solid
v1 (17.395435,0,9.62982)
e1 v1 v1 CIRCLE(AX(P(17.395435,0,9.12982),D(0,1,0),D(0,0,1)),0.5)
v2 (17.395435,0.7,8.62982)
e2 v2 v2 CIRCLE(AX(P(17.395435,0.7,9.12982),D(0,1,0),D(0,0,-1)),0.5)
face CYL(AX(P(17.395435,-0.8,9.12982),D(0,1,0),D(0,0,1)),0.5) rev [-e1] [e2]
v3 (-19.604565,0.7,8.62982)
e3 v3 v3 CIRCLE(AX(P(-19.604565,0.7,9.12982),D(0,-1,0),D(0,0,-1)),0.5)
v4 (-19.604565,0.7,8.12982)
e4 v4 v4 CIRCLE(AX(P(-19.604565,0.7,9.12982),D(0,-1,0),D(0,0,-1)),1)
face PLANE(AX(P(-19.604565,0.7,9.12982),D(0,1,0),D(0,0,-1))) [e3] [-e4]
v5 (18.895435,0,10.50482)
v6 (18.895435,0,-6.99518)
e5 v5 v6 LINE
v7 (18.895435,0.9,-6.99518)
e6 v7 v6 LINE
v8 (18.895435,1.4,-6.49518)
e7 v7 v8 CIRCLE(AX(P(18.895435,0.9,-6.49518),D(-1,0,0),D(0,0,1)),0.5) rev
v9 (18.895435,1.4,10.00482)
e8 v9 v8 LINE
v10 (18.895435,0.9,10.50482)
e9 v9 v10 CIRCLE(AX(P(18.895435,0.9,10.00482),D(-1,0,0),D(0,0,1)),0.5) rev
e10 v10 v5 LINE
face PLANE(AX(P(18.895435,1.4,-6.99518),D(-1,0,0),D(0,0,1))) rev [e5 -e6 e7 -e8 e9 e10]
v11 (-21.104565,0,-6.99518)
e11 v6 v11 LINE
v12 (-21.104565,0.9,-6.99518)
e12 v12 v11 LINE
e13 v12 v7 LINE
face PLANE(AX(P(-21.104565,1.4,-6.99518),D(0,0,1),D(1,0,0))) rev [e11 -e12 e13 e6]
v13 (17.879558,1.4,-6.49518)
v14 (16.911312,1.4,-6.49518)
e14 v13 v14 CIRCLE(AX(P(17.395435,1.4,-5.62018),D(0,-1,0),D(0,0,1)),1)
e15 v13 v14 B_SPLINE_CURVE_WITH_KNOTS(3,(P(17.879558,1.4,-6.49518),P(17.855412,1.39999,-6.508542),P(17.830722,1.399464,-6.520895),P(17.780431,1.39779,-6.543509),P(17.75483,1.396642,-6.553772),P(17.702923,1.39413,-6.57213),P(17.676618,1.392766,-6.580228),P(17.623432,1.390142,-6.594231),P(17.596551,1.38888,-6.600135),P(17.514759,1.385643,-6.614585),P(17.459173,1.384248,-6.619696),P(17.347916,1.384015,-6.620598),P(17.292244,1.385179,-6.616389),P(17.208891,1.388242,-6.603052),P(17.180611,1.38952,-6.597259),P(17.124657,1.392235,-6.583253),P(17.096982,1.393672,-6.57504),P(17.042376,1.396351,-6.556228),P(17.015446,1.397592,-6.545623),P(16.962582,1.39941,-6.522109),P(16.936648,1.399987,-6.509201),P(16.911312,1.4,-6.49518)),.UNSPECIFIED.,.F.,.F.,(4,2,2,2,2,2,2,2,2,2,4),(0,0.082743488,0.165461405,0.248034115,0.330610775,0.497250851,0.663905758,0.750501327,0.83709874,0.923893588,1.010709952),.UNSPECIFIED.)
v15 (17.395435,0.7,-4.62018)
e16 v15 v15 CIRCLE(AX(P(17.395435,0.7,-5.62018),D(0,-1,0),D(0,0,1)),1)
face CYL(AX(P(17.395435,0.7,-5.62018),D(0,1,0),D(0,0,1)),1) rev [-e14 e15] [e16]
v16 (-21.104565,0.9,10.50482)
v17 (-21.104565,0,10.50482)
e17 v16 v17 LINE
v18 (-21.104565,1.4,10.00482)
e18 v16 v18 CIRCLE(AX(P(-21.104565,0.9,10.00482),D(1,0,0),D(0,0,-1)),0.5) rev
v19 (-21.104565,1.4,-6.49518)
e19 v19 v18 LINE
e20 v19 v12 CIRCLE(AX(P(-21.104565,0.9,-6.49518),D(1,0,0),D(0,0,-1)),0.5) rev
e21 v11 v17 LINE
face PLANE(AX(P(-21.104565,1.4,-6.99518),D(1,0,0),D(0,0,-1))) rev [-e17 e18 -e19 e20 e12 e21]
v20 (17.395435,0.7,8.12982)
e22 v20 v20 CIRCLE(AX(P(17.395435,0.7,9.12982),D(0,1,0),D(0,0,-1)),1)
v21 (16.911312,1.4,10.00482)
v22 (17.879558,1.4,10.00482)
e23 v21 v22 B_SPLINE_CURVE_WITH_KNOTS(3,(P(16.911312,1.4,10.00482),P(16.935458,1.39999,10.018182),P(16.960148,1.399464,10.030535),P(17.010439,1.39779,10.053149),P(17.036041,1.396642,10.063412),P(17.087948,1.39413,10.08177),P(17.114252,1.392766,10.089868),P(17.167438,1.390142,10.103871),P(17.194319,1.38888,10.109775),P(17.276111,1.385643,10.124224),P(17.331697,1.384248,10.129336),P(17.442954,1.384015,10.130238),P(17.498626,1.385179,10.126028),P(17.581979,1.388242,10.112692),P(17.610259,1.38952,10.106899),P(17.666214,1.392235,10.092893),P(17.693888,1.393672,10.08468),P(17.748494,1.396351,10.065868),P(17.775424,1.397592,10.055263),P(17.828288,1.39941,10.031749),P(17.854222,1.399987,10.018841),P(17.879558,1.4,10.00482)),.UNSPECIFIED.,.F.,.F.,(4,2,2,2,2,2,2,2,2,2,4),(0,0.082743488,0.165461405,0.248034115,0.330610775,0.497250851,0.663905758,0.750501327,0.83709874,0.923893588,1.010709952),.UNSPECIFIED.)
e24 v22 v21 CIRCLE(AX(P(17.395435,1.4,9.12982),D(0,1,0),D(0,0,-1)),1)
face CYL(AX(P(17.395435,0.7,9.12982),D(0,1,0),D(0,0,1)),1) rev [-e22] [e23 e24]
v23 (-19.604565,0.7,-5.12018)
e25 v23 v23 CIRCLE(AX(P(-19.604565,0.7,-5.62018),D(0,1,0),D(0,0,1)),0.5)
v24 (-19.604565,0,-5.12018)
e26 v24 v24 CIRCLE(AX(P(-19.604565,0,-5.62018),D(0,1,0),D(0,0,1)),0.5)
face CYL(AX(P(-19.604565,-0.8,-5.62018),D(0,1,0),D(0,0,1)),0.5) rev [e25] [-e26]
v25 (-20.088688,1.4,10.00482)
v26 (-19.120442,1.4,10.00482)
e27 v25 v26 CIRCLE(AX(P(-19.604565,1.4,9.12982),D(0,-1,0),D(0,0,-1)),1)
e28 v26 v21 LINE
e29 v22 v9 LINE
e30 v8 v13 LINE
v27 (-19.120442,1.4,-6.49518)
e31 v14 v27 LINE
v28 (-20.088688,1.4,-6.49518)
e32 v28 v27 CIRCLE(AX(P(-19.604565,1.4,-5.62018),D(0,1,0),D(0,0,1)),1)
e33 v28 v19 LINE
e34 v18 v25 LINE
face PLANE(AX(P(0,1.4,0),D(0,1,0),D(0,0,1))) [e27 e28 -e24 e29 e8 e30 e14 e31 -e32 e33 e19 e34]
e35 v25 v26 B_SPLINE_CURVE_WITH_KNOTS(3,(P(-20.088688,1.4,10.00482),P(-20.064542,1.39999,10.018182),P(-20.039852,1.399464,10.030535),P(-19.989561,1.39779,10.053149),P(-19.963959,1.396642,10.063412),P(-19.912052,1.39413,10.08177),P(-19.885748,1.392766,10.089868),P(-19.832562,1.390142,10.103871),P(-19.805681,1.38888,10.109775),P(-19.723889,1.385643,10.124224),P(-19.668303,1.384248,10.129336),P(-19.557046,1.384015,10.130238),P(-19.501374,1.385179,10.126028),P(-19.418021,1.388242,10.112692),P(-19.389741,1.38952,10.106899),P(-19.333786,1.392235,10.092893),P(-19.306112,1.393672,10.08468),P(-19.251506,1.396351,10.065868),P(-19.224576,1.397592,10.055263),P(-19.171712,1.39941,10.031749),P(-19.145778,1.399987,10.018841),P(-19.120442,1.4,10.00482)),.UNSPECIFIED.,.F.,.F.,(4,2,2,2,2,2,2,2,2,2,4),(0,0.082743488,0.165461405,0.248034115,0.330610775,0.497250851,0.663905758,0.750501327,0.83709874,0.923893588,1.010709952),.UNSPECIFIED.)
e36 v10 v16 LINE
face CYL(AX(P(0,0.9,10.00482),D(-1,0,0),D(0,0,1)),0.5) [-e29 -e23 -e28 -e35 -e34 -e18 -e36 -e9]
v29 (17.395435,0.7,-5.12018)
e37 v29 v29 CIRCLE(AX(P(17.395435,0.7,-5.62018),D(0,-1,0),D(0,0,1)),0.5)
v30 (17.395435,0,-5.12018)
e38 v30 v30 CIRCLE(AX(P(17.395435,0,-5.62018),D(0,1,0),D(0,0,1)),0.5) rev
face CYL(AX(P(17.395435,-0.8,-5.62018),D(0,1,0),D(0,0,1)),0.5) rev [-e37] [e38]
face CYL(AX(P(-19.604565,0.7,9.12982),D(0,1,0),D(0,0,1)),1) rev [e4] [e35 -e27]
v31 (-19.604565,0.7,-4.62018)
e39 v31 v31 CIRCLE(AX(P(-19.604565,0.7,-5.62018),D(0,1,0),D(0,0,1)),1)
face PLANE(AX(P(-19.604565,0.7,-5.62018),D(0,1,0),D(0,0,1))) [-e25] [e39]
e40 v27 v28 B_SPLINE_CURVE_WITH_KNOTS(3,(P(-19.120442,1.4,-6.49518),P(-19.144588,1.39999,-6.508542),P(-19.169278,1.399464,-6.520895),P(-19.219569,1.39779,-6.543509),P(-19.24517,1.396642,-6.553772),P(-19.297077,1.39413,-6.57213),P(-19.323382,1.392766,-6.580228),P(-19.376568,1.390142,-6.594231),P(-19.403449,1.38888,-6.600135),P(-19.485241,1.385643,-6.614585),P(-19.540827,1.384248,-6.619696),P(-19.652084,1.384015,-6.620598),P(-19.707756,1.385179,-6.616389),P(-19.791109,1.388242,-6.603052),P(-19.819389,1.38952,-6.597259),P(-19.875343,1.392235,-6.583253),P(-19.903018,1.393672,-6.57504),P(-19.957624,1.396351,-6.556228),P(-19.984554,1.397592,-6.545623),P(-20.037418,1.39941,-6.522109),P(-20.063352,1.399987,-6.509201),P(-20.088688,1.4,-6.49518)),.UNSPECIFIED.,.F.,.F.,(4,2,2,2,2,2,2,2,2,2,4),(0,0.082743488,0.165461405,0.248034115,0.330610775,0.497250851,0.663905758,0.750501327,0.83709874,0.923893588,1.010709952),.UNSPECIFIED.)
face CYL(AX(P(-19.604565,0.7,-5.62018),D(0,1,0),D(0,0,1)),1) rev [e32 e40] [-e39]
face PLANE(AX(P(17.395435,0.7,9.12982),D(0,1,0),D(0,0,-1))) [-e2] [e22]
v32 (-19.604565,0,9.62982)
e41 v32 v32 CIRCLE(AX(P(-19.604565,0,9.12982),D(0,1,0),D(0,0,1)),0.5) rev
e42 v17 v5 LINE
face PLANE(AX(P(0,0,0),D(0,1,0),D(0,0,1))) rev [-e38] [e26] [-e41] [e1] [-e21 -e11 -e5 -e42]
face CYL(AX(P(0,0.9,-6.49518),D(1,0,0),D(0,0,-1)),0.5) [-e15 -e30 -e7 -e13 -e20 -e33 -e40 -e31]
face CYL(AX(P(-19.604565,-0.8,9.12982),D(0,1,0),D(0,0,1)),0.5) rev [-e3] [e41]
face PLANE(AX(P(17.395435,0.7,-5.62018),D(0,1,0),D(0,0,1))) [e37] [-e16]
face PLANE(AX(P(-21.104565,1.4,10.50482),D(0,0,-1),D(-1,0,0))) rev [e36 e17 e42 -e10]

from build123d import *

# Parameters (mm, degrees)
SKETCH_1_W               = 40
SKETCH_1_H               = 17.5
EXTRUDE_1_DEPTH          = 1.4
SKETCH_3_R               = 1
CUT_EXTRUDE_2_DEPTH      = 0.7
SKETCH_4_R               = 0.5
CUT_EXTRUDE_3_DEPTH      = 1.5
MIRROR_2_COPY_1_SKETCH_R = 1
MIRROR_2_COPY_1_DEPTH    = 0.7
MIRROR_2_COPY_2_SKETCH_R = 0.5
MIRROR_2_COPY_2_DEPTH    = 1.5
FILLET_2_R               = 0.5
FILLET_3_R               = 0.5


with BuildPart() as part:
    # 草图1 → 凸台-拉伸1 (new body)
    with BuildSketch(Plane(origin=(0, 0, 0), x_dir=(1, 0, 0), z_dir=(0, 1, 0))):
        with Locations((-1.104564914, -1.754819984)):
            Rectangle(SKETCH_1_W, SKETCH_1_H)
    extrude(amount=EXTRUDE_1_DEPTH)

    # 草图3 → 切除-拉伸2 (cut)
    with BuildSketch(Plane(origin=(0, 1.4, 0), x_dir=(1, 0, 0), z_dir=(0, 1, 0))):
        with Locations(Location((-19.604564914, 5.620180016, 0), (0, 0, 270))):
            Circle(SKETCH_3_R)
    cut_extrude_2 = extrude(amount=-CUT_EXTRUDE_2_DEPTH, mode=Mode.SUBTRACT)

    # 草图4 → 切除-拉伸3 (cut)
    with BuildSketch(Plane(origin=(0, 0.7, 0), x_dir=(1, 0, 0), z_dir=(0, 1, 0))):
        with Locations(Location((-19.604564914, 5.620180016, 0), (0, 0, 270))):
            Circle(SKETCH_4_R)
    cut_extrude_3 = extrude(amount=-CUT_EXTRUDE_3_DEPTH, mode=Mode.SUBTRACT)

    # 镜向1: 切除-拉伸2, 切除-拉伸3 across plane
    add(cut_extrude_2.mirror(Plane.XY.offset(1.754819984)), mode=Mode.SUBTRACT)
    add(cut_extrude_3.mirror(Plane.XY.offset(1.754819984)), mode=Mode.SUBTRACT)

    # 镜向2: 切除-拉伸2, 切除-拉伸3 across plane
    add(cut_extrude_2.mirror(Plane(origin=(-1.104564914, 0, 0), x_dir=(0, 0, 1), z_dir=(1, 0, 0))), mode=Mode.SUBTRACT)
    add(cut_extrude_3.mirror(Plane(origin=(-1.104564914, 0, 0), x_dir=(0, 0, 1), z_dir=(1, 0, 0))), mode=Mode.SUBTRACT)

    # 镜向2 copy 1 sketch → 镜向2 copy 1 (cut)
    with BuildSketch(Plane(origin=(-2.209129827, 1.4, 3.509639969), x_dir=(-1, 0, 0), z_dir=(0, 1, 0))):
        with Locations(Location((-19.604564914, 5.620180016, 0), (0, 0, 270))):
            Circle(MIRROR_2_COPY_1_SKETCH_R)
    extrude(amount=-MIRROR_2_COPY_1_DEPTH, mode=Mode.SUBTRACT)

    # 镜向2 copy 2 sketch → 镜向2 copy 2 (cut)
    with BuildSketch(Plane(origin=(-2.209129827, 0.7, 3.509639969), x_dir=(-1, 0, 0), z_dir=(0, 1, 0))):
        with Locations(Location((-19.604564914, 5.620180016, 0), (0, 0, 270))):
            Circle(MIRROR_2_COPY_2_SKETCH_R)
    extrude(amount=-MIRROR_2_COPY_2_DEPTH, mode=Mode.SUBTRACT)

    # 圆角2
    # the kernel refuses this fillet: 0.5 mm, written as the material it takes off along each edge
    with BuildSketch(Plane(origin=(-22.354564914, 1.4, -6.995180016), x_dir=(0, -1, 0), z_dir=(1, 0, 0))) as fillet_2_piece_1:
        with BuildLine():
            CenterArc((FILLET_2_R, -FILLET_2_R), FILLET_2_R, 90, 90)
            Line((0, -FILLET_2_R), (0, 0))
            Line((0, 0), (FILLET_2_R, 0))
        make_face()
    extrude(amount=42.5, mode=Mode.SUBTRACT)

    # 圆角3
    # the kernel refuses this fillet: 0.5 mm, written as the material it takes off along each edge
    with BuildSketch(Plane(origin=(20.145435086, 1.4, 10.504819984), x_dir=(0, -1, 0), z_dir=(-1, 0, 0))) as fillet_3_piece_1:
        with BuildLine():
            CenterArc((FILLET_3_R, -FILLET_3_R), FILLET_3_R, 90, 90)
            Line((0, -FILLET_3_R), (0, 0))
            Line((0, 0), (FILLET_3_R, 0))
        make_face()
    extrude(amount=42.5, mode=Mode.SUBTRACT)


solid = part.part
